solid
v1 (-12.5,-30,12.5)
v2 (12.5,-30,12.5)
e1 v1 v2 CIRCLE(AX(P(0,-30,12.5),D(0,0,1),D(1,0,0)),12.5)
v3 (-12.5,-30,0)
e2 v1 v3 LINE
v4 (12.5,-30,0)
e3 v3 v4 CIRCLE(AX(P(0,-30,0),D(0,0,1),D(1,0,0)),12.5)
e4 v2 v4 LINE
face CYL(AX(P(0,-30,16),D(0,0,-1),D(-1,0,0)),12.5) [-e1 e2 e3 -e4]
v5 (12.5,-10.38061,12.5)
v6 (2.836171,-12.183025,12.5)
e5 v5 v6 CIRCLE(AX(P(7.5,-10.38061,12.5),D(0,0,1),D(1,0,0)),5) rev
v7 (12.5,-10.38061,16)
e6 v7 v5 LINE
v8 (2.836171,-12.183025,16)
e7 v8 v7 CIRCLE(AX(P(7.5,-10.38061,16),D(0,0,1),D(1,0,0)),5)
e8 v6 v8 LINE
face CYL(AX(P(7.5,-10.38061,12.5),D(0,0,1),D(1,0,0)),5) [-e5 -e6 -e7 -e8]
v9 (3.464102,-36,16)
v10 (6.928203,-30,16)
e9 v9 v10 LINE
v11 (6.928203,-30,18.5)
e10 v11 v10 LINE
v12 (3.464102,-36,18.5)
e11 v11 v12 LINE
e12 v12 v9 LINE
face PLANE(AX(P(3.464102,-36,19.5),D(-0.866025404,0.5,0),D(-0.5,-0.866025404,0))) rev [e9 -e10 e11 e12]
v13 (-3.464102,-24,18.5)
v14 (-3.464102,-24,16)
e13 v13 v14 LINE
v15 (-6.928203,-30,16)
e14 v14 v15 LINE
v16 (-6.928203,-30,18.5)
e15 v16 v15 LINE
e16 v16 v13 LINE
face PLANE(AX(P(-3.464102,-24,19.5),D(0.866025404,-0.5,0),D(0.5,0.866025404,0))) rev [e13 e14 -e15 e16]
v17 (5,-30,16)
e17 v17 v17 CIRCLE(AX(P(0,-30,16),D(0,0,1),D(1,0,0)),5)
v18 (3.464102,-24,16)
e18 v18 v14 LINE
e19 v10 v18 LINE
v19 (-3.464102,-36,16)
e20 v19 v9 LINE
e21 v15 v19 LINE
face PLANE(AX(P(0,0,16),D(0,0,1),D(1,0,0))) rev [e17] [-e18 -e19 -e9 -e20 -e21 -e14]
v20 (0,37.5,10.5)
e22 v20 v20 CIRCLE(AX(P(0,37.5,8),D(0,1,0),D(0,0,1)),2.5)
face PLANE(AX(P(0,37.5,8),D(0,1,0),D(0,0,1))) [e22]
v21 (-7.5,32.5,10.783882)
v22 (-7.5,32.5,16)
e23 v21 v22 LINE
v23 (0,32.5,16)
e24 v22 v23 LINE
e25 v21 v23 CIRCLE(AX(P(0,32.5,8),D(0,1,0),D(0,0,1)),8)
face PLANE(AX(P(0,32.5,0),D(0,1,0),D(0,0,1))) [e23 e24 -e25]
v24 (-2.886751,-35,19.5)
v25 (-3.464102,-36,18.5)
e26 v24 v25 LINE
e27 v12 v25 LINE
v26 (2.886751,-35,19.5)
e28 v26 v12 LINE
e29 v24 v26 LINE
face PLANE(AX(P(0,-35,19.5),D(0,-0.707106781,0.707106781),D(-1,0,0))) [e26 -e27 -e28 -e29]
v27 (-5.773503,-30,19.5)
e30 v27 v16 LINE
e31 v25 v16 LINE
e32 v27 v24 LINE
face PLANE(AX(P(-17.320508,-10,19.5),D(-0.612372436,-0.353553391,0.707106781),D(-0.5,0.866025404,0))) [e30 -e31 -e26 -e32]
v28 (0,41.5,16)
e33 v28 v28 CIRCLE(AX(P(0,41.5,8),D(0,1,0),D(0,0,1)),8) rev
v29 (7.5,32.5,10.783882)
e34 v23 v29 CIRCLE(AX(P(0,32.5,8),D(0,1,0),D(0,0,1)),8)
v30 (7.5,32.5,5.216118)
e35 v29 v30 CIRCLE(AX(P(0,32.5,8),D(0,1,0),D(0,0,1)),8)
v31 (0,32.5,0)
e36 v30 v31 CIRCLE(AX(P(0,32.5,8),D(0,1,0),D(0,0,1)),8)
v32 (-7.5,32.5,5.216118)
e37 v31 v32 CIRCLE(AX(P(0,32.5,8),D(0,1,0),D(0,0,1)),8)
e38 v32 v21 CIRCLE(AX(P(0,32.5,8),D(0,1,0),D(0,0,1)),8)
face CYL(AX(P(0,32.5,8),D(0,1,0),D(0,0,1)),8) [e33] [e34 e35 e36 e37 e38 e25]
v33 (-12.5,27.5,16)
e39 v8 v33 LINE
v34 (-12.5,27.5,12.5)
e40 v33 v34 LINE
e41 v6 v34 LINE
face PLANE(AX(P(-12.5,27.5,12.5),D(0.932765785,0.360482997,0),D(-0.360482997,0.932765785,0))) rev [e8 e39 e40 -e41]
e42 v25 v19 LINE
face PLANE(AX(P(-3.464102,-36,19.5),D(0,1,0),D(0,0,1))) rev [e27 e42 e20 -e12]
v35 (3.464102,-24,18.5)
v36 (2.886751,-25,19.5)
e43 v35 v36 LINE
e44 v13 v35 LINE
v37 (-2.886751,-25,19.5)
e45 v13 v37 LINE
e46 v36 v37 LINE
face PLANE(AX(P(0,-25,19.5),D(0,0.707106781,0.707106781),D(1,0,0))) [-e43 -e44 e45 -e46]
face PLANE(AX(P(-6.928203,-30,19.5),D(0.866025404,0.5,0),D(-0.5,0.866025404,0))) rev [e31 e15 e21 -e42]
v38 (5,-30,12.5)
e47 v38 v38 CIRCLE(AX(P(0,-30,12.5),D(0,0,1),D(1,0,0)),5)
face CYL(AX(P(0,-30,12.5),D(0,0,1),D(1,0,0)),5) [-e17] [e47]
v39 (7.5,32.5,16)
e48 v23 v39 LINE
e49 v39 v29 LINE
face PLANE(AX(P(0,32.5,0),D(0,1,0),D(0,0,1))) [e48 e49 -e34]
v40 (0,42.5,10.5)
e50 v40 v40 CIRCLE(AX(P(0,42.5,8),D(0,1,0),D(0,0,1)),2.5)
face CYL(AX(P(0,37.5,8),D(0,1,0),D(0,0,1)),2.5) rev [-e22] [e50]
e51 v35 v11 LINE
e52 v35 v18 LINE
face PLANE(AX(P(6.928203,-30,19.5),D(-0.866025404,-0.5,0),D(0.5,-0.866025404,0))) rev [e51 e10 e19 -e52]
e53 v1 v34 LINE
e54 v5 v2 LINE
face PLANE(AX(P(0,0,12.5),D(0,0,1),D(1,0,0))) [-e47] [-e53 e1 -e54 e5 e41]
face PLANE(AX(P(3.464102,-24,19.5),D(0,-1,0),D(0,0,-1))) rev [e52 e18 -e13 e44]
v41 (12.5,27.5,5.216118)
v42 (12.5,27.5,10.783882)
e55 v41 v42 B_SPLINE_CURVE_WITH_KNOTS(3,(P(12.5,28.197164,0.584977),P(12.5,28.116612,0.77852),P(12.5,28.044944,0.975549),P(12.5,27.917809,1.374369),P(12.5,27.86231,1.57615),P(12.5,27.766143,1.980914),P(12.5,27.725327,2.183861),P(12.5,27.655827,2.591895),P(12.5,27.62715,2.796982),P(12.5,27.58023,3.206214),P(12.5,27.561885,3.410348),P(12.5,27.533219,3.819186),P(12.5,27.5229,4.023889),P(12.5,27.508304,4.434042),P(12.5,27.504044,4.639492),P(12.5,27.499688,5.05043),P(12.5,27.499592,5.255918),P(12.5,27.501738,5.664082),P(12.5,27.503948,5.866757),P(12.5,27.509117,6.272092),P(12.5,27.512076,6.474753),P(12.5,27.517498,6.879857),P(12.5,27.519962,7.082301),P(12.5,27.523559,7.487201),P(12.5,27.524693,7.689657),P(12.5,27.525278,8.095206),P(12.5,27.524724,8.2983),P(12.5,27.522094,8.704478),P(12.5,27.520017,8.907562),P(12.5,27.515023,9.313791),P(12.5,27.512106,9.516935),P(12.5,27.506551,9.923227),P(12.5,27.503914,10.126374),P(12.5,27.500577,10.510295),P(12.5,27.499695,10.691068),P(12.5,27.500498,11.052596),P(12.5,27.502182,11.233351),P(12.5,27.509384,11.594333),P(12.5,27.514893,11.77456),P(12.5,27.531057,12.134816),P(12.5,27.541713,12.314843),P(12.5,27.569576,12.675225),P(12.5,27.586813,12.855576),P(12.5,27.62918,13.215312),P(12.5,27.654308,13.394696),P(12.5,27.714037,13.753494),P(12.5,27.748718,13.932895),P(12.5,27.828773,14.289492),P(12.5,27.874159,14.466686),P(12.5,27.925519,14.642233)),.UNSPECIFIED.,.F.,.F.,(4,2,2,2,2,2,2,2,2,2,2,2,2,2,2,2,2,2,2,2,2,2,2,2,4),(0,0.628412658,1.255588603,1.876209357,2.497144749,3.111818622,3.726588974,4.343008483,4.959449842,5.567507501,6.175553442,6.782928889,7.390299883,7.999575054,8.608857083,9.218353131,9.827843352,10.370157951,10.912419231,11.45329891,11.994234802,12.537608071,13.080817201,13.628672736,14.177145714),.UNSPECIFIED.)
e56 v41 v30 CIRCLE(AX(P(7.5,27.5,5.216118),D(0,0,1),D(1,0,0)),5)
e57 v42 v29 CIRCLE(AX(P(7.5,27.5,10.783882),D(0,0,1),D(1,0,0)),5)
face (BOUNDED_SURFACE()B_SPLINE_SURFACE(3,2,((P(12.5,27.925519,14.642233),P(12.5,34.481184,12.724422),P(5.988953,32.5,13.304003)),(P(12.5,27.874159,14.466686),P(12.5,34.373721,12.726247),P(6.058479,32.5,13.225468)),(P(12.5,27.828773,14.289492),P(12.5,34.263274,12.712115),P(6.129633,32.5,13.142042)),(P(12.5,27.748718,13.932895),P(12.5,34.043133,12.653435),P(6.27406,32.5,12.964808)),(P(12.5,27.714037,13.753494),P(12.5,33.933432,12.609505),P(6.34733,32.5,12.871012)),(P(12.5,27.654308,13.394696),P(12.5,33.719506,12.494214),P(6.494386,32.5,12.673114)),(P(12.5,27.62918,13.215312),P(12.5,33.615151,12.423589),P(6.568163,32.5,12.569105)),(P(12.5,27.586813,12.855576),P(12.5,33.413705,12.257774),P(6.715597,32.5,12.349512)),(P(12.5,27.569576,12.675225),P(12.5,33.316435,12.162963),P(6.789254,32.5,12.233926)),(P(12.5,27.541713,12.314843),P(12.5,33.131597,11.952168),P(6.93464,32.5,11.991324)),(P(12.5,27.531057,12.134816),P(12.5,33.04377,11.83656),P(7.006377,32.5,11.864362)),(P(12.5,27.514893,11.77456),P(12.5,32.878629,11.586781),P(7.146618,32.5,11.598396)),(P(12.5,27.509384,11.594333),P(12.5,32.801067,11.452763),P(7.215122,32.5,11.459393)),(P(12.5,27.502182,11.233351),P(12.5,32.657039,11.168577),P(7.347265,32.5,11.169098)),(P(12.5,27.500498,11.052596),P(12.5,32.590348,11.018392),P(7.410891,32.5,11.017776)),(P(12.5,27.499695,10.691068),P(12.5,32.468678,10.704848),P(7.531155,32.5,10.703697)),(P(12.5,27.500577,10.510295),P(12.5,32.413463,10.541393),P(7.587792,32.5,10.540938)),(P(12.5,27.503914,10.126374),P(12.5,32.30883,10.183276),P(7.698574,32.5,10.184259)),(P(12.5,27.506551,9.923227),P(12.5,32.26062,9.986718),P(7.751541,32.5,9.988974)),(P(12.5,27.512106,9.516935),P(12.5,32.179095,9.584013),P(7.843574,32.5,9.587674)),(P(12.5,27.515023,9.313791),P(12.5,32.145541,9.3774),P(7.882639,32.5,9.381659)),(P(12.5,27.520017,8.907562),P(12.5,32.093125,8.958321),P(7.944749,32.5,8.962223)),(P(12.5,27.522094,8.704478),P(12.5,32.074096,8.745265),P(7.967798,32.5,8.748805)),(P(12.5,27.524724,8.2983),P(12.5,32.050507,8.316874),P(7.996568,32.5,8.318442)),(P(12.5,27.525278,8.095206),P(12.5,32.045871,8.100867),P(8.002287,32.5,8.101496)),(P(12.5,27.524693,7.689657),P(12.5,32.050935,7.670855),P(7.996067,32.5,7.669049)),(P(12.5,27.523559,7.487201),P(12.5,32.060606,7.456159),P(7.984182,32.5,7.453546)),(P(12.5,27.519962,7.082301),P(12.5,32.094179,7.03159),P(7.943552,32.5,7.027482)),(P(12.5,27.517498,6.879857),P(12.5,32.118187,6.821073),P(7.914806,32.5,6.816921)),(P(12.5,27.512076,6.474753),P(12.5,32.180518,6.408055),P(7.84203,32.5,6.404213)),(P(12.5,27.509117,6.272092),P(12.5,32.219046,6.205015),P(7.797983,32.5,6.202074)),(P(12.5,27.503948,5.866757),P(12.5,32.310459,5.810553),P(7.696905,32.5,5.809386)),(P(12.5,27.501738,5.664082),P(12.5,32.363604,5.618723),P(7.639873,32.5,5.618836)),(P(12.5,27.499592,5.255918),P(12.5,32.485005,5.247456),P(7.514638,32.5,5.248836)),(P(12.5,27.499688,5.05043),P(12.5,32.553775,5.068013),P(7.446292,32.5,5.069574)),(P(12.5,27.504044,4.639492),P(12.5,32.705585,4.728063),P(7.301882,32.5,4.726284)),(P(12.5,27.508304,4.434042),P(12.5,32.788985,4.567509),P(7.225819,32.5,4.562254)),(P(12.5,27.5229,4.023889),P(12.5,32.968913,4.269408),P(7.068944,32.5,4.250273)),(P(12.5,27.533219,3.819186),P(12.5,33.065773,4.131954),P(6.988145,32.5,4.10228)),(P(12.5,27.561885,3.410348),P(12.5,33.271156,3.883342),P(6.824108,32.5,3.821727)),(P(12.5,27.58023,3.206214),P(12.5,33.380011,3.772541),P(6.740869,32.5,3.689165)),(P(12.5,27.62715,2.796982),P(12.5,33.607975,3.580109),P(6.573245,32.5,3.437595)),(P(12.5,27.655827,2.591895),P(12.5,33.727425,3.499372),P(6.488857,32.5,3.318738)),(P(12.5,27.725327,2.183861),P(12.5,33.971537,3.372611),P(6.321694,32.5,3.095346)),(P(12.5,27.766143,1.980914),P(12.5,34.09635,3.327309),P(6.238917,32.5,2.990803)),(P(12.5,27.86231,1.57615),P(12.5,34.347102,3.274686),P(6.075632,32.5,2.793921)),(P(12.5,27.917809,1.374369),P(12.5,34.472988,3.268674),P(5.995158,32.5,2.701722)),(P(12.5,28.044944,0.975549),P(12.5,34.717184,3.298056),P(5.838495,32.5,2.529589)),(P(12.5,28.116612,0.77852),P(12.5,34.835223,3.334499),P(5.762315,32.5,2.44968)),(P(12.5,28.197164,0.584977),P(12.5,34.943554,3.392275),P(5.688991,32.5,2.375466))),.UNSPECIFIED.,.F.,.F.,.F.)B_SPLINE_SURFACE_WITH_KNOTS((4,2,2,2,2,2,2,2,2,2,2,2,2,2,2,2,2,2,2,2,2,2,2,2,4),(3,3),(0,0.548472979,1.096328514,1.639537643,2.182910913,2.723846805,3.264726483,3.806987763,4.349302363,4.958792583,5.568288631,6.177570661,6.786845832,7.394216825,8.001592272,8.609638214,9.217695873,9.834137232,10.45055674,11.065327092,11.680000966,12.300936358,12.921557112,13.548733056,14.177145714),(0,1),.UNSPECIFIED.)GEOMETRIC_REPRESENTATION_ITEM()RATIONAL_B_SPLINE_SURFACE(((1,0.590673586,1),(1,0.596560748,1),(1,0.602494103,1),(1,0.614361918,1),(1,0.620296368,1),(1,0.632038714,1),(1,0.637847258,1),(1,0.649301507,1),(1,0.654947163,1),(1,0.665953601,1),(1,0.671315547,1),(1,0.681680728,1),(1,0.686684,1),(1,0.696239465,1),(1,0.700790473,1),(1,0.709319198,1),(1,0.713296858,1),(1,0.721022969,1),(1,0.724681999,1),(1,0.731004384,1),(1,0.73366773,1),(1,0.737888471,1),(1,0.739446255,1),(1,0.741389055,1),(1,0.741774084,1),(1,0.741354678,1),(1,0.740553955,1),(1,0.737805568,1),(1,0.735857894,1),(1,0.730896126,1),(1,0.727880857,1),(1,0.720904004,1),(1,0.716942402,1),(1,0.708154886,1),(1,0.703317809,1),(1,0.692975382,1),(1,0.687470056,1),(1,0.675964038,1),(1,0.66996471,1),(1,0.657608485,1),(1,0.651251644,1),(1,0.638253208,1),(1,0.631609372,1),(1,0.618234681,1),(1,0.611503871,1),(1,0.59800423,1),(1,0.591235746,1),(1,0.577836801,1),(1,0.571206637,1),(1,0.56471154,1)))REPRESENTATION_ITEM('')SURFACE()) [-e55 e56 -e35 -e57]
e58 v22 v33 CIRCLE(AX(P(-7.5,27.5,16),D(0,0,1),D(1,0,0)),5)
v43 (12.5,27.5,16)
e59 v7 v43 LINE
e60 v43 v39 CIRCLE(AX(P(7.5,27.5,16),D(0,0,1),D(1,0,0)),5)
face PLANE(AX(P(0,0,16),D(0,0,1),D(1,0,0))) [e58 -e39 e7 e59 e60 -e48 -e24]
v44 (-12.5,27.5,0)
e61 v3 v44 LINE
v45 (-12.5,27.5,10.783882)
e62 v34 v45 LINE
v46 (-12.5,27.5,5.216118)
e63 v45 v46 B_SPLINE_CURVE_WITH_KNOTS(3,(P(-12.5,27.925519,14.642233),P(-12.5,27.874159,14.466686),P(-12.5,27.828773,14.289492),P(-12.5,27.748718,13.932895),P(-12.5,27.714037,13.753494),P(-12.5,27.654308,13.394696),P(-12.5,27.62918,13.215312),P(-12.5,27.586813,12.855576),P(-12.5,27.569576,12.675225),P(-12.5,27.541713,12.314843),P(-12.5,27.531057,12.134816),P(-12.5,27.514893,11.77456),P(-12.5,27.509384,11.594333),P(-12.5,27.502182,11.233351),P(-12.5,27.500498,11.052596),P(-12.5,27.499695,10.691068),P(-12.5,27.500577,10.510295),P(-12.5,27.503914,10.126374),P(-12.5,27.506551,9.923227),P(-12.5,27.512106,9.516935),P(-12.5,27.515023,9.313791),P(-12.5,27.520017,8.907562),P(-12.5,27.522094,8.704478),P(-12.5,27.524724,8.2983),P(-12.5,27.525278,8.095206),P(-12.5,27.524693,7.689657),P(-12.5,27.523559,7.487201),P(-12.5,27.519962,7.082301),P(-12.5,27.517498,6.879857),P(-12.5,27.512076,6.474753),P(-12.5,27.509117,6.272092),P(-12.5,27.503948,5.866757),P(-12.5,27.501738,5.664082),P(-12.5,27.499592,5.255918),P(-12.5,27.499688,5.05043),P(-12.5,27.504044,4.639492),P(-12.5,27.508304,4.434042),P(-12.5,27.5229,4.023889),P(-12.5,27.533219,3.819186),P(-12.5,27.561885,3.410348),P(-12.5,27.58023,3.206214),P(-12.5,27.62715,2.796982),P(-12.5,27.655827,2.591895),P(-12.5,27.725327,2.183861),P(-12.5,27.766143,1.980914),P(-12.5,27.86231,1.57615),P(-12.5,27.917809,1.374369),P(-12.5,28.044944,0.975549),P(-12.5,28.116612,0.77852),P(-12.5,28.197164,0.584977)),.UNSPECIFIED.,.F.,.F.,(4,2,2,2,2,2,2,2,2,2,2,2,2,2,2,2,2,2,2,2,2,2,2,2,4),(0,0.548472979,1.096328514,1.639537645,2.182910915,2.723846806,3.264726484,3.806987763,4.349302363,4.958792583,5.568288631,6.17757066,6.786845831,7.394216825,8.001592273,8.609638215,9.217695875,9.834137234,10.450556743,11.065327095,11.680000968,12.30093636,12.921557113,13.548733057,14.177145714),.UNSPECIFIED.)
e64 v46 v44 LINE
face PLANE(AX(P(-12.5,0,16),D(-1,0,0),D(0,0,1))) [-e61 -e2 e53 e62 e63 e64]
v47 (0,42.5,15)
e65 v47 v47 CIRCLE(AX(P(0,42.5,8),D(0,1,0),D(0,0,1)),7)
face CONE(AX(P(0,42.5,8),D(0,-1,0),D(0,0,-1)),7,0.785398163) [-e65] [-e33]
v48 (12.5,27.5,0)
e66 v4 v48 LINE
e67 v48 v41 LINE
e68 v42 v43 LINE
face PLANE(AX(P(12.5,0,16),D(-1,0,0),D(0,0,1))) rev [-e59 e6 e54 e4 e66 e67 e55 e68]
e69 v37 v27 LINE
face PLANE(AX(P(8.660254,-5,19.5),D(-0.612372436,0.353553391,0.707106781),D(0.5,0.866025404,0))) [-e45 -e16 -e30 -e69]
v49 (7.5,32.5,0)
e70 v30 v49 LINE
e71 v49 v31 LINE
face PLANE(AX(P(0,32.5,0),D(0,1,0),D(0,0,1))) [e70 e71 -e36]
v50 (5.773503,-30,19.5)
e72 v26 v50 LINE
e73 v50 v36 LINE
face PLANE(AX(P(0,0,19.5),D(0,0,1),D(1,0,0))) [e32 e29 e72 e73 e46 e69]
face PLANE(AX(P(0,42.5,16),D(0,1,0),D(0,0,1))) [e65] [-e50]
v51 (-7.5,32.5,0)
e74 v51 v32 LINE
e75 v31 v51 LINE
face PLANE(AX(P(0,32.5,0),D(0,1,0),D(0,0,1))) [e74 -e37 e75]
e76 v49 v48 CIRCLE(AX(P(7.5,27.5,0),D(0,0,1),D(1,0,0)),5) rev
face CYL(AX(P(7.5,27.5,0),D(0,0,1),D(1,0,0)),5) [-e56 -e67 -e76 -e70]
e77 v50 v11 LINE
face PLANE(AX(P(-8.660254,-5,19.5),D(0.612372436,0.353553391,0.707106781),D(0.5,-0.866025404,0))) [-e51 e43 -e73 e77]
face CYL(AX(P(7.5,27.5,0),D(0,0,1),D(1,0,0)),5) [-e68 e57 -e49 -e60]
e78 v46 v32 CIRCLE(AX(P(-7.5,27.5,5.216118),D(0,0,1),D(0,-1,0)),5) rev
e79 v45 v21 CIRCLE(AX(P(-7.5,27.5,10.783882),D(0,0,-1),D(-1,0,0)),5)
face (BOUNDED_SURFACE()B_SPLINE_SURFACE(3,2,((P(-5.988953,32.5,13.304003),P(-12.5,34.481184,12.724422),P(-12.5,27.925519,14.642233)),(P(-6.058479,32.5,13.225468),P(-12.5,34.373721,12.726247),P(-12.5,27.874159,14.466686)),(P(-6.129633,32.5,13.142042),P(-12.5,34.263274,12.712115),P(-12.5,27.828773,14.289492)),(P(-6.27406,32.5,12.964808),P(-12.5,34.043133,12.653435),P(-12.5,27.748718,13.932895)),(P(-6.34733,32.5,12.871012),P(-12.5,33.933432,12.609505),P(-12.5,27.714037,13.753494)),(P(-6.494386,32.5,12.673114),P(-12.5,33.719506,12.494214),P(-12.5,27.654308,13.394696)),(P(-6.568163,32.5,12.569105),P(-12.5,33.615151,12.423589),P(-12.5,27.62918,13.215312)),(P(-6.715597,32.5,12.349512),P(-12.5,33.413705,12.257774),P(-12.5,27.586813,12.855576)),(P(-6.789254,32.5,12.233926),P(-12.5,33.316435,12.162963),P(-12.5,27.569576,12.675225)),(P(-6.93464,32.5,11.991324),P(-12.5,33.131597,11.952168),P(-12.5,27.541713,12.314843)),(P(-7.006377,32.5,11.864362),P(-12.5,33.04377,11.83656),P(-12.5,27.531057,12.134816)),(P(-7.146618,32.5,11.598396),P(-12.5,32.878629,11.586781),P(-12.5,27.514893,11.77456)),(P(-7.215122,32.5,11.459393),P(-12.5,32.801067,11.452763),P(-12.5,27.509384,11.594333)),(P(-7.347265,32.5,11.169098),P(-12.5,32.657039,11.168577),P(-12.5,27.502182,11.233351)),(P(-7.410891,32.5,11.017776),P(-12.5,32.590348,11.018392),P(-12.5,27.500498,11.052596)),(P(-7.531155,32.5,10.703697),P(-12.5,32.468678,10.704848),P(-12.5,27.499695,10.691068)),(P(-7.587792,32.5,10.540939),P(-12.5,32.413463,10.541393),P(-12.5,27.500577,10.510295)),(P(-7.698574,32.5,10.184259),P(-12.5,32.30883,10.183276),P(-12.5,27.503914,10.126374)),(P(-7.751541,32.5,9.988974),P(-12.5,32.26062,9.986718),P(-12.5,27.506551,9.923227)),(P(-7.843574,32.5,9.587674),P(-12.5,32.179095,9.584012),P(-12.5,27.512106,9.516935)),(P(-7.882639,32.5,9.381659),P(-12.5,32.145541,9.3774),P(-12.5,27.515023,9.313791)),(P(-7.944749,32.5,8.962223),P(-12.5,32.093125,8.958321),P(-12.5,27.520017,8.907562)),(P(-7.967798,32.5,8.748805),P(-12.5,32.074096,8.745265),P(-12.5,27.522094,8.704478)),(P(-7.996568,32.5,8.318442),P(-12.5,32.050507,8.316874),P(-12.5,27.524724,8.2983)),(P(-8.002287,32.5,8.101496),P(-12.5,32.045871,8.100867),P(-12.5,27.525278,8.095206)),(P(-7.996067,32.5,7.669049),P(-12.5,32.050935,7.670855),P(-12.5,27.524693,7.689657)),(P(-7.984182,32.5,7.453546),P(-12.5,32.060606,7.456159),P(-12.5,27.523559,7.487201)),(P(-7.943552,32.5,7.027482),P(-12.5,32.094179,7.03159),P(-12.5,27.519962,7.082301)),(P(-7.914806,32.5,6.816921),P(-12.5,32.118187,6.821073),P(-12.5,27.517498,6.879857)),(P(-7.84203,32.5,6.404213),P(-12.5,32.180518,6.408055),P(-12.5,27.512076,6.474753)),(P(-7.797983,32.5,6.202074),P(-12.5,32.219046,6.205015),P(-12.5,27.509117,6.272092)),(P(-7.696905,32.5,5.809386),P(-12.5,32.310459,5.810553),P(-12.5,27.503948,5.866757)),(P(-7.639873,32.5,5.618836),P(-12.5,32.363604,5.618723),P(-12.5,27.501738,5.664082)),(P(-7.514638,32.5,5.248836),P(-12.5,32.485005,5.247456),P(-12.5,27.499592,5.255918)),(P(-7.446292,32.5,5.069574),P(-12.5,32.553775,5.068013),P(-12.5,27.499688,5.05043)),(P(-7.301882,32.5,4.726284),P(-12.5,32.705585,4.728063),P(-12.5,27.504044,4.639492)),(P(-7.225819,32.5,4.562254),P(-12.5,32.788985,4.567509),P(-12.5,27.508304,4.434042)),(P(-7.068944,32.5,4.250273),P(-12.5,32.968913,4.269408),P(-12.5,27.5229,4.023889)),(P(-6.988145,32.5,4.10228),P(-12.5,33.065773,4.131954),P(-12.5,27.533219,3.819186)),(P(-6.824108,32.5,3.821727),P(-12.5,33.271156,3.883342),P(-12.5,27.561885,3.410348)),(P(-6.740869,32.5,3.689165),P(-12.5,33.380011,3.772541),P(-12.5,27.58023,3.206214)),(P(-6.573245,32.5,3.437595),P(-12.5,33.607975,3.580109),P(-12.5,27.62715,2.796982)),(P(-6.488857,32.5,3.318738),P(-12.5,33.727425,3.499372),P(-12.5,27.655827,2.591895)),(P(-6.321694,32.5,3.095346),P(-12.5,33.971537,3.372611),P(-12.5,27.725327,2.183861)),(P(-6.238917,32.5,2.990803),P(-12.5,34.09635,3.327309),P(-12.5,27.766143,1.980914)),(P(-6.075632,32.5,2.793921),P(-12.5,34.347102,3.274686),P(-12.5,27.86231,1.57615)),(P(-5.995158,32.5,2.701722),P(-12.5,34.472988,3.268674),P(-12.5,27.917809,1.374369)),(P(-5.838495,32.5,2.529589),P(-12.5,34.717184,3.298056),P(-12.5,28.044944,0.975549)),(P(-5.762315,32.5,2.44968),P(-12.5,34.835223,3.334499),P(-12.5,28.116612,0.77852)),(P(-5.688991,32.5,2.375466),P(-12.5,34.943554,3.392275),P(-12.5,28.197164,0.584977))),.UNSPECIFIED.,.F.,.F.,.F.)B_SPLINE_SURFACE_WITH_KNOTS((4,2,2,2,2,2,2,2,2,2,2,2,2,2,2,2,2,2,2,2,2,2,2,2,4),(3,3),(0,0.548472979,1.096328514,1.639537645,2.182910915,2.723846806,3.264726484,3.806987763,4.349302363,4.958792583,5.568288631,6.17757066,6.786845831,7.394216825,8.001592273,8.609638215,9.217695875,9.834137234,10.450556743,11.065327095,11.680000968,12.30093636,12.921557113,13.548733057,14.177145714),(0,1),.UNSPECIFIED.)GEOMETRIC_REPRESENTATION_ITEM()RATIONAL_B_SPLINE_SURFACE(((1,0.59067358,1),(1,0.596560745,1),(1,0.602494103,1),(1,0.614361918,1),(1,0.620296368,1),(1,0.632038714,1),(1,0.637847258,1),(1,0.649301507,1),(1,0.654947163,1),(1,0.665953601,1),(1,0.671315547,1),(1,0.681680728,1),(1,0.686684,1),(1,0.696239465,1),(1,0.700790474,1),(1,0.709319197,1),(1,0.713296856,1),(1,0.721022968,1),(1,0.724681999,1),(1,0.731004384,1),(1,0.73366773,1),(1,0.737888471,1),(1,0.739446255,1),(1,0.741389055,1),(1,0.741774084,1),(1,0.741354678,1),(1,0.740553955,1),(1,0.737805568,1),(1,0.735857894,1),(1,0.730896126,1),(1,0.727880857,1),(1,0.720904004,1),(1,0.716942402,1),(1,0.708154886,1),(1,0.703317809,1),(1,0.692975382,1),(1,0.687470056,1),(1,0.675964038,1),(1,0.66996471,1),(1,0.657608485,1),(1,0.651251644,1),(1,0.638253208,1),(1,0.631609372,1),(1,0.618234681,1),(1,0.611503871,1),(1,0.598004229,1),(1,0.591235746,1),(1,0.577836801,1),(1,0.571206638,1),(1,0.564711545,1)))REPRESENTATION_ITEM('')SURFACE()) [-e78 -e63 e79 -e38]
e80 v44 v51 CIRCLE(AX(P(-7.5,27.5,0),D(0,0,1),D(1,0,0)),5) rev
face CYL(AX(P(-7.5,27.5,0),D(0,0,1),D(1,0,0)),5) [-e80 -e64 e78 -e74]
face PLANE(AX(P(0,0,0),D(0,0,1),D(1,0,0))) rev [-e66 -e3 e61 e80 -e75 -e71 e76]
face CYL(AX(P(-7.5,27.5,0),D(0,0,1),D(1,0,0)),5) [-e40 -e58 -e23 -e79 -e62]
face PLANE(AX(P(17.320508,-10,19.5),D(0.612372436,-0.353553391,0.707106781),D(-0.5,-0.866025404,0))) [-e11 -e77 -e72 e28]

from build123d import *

# Parameters (mm, degrees)
CROQUIS1_W              = 25
CROQUIS1_H              = 12.5
SALIENTE_EXTRUIR2_DEPTH = 16
CORTAR_EXTRUIR3_START   = -3.5
CROQUIS2_R              = 12.5
CROQUIS2_R_2            = 5
CORTAR_EXTRUIR3_DEPTH   = 3.5
REDONDEO5_R             = 5
REDONDEO6_R             = 5
SALIENTE_EXTRUIR3_DEPTH = 3.5
CHAFL_N1_SIZE           = 1
CHAFL_N2_SIZE           = 1
CHAFL_N3_SIZE           = 1
CHAFL_N4_SIZE           = 1
CHAFL_N5_SIZE           = 1
CHAFL_N6_SIZE           = 1
CORTAR_EXTRUIR5_DEPTH   = 10
REDONDEO9_R             = 5
REDONDEO10_R            = 5
CROQUIS5_R              = 2.5
CORTAR_EXTRUIR6_DEPTH   = 5
CORTAR_EXTRUIR9_START   = -3.5
CORTAR_EXTRUIR9_DEPTH   = 3.5
REDONDEO12_START        = 12.5
REDONDEO12_DEPTH        = 4.5


with BuildPart() as part:
    # Croquis1 → Saliente-Extruir2 (new body)
    with BuildSketch(Plane.XY):
        with Locations((0, 36.25)):
            Rectangle(CROQUIS1_W, CROQUIS1_H)
        with Locations((0, 23.75)):
            Rectangle(CROQUIS1_W, CROQUIS1_H)
        with BuildLine():
            Line((-12.5, 17.5), (-12.5, -30))
            ThreePointArc((-12.5, -30), (0, -17.5), (12.5, -30))
            Line((12.5, -30), (12.5, 17.5))
            Line((12.5, 17.5), (-12.5, 17.5))
        make_face()
        with BuildLine():
            ThreePointArc((12.5, -30), (0, -17.5), (-12.5, -30))
            Line((-12.5, -30), (12.5, -30))
        make_face()
        with BuildLine():
            Line((12.5, -30), (-12.5, -30))
            ThreePointArc((-12.5, -30), (0, -42.5), (12.5, -30))
        make_face()
    extrude(amount=SALIENTE_EXTRUIR2_DEPTH)

    # Croquis2 → Cortar-Extruir3 (cut)
    with BuildSketch(Plane.XY.offset(16).offset(CORTAR_EXTRUIR3_START)):
        with Locations((0, -30)):
            Circle(CROQUIS2_R)
        with Locations((0, -30)):
            Circle(CROQUIS2_R_2, mode=Mode.SUBTRACT)
    extrude(amount=CORTAR_EXTRUIR3_DEPTH, mode=Mode.SUBTRACT)

    # Redondeo5
    redondeo5_edges = [part.edges().sort_by_distance(p)[0] for p in [
        (-12.5, -30, 14.25),
    ]]
    fillet(redondeo5_edges, radius=REDONDEO5_R)

    # Redondeo6
    redondeo6_edges = [part.edges().sort_by_distance(p)[0] for p in [
        (12.5, -30, 14.25),
    ]]
    fillet(redondeo6_edges, radius=REDONDEO6_R)

    # Croquis3 → Saliente-Extruir3 (add)
    with BuildSketch(Plane.XY.offset(16)):
        Polygon((6.92820323, -30), (3.464101615, -24), (-3.464101615, -24), (-6.92820323, -30), (-3.464101615, -36), (3.464101615, -36), align=None)
    extrude(amount=SALIENTE_EXTRUIR3_DEPTH)

    # Chaflán1
    chafl_n1_edges = [part.edges().sort_by_distance(p)[0] for p in [
        (5.196152423, -27, 19.5),
    ]]
    chamfer(chafl_n1_edges, length=CHAFL_N1_SIZE)

    # Chaflán2
    chafl_n2_edges = [part.edges().sort_by_distance(p)[0] for p in [
        (-0.577350269, -24, 19.5),
    ]]
    chamfer(chafl_n2_edges, length=CHAFL_N2_SIZE)

    # Chaflán3
    chafl_n3_edges = [part.edges().sort_by_distance(p)[0] for p in [
        (4.907477288, -33.5, 19.5),
    ]]
    chamfer(chafl_n3_edges, length=CHAFL_N3_SIZE)

    # Chaflán4
    chafl_n4_edges = [part.edges().sort_by_distance(p)[0] for p in [
        (-0.577350269, -36, 19.5),
    ]]
    chamfer(chafl_n4_edges, length=CHAFL_N4_SIZE)

    # Chaflán5
    chafl_n5_edges = [part.edges().sort_by_distance(p)[0] for p in [
        (-5.484827557, -32.5, 19.5),
    ]]
    chamfer(chafl_n5_edges, length=CHAFL_N5_SIZE)

    # Chaflán6
    chafl_n6_edges = [part.edges().sort_by_distance(p)[0] for p in [
        (-5.196152423, -27, 19.5),
    ]]
    chamfer(chafl_n6_edges, length=CHAFL_N6_SIZE)

    # Croquis4 → Cortar-Extruir5 (cut)
    with BuildSketch(Plane(origin=(0, 42.5, 0), x_dir=(1, 0, 0), z_dir=(0, 1, 0))):
        with BuildLine():
            ThreePointArc((-8, -8), (-5.656854249, -2.343145751), (0, 0))
            Line((0, 0), (-12.5, 0))
            Line((-12.5, 0), (-12.5, -8))
            Line((-12.5, -8), (-8, -8))
        make_face()
        with BuildLine():
            ThreePointArc((0, -16), (-5.656854249, -13.656854249), (-8, -8))
            Line((-8, -8), (-12.5, -8))
            Line((-12.5, -8), (-12.5, -16))
            Line((-12.5, -16), (0, -16))
        make_face()
        with BuildLine():
            Line((12.5, -8), (8, -8))
            ThreePointArc((8, -8), (5.656854249, -13.656854249), (0, -16))
            Line((0, -16), (12.5, -16))
            Line((12.5, -16), (12.5, -8))
        make_face()
        with BuildLine():
            Line((12.5, 0), (0, 0))
            ThreePointArc((0, 0), (5.656854249, -2.343145751), (8, -8))
            Line((8, -8), (12.5, -8))
            Line((12.5, -8), (12.5, 0))
        make_face()
    extrude(amount=-CORTAR_EXTRUIR5_DEPTH, mode=Mode.SUBTRACT)

    # Redondeo9
    redondeo9_edges = [part.edges().sort_by_distance(p)[0] for p in [
        (12.5, 32.5, 8),
    ]]
    fillet(redondeo9_edges, radius=REDONDEO9_R)

    # Redondeo10
    redondeo10_edges = [part.edges().sort_by_distance(p)[0] for p in [
        (-12.5, 32.5, 8),
    ]]
    fillet(redondeo10_edges, radius=REDONDEO10_R)

    # Croquis5 → Cortar-Extruir6 (cut)
    with BuildSketch(Plane(origin=(0, 42.5, 0), x_dir=(1, 0, 0), z_dir=(0, 1, 0))):
        with Locations(Location((0, -8, 0), (0, 0, 270))):
            Circle(CROQUIS5_R)
    extrude(amount=-CORTAR_EXTRUIR6_DEPTH, mode=Mode.SUBTRACT)

    # Chaflán7: read off the stored shape, not the designer's step
    # Chaflán7 outline → Chaflán7 (revolve, cut)
    with BuildSketch(Plane.XY.offset(8)):
        Polygon((8, 42.5), (7, 42.5), (8, 41.5), align=None)
    revolve(axis=Axis((0, 0, 8), (0, 1, 0)), mode=Mode.SUBTRACT)

    # Croquis7 → Cortar-Extruir9 (cut)
    with BuildSketch(Plane.XY.offset(16).offset(CORTAR_EXTRUIR9_START)):
        with BuildLine():
            Line((-12.5, 27.5), (5.357142857, -18.706151214))
            ThreePointArc((5.357142857, -18.706151214), (0, -17.5), (-5.357142857, -18.706151214))
            ThreePointArc((-5.357142857, -18.706151214), (-10.172612419, -18.414382973), (-12.5, -14.188611699))
            Line((-12.5, -14.188611699), (-12.5, 27.5))
        make_face()
    extrude(amount=CORTAR_EXTRUIR9_DEPTH, mode=Mode.SUBTRACT)

    # Redondeo12: read off the stored shape, not the designer's step
    # Redondeo12 outline → Redondeo12 (cut)
    with BuildSketch(Plane.XY.offset(REDONDEO12_START)):
        with BuildLine():
            ThreePointArc((12.5, -10.380609645), (8.416748435, -15.29584843), (2.836171077, -12.18302463))
            Line((2.836171077, -12.18302463), (5.357142857, -18.706151214))
            ThreePointArc((5.357142857, -18.706151214), (10.172612419, -18.414382973), (12.5, -14.188611699))
            Line((12.5, -14.188611699), (12.5, -10.380609645))
        make_face()
    extrude(amount=REDONDEO12_DEPTH, mode=Mode.SUBTRACT)


solid = part.part
